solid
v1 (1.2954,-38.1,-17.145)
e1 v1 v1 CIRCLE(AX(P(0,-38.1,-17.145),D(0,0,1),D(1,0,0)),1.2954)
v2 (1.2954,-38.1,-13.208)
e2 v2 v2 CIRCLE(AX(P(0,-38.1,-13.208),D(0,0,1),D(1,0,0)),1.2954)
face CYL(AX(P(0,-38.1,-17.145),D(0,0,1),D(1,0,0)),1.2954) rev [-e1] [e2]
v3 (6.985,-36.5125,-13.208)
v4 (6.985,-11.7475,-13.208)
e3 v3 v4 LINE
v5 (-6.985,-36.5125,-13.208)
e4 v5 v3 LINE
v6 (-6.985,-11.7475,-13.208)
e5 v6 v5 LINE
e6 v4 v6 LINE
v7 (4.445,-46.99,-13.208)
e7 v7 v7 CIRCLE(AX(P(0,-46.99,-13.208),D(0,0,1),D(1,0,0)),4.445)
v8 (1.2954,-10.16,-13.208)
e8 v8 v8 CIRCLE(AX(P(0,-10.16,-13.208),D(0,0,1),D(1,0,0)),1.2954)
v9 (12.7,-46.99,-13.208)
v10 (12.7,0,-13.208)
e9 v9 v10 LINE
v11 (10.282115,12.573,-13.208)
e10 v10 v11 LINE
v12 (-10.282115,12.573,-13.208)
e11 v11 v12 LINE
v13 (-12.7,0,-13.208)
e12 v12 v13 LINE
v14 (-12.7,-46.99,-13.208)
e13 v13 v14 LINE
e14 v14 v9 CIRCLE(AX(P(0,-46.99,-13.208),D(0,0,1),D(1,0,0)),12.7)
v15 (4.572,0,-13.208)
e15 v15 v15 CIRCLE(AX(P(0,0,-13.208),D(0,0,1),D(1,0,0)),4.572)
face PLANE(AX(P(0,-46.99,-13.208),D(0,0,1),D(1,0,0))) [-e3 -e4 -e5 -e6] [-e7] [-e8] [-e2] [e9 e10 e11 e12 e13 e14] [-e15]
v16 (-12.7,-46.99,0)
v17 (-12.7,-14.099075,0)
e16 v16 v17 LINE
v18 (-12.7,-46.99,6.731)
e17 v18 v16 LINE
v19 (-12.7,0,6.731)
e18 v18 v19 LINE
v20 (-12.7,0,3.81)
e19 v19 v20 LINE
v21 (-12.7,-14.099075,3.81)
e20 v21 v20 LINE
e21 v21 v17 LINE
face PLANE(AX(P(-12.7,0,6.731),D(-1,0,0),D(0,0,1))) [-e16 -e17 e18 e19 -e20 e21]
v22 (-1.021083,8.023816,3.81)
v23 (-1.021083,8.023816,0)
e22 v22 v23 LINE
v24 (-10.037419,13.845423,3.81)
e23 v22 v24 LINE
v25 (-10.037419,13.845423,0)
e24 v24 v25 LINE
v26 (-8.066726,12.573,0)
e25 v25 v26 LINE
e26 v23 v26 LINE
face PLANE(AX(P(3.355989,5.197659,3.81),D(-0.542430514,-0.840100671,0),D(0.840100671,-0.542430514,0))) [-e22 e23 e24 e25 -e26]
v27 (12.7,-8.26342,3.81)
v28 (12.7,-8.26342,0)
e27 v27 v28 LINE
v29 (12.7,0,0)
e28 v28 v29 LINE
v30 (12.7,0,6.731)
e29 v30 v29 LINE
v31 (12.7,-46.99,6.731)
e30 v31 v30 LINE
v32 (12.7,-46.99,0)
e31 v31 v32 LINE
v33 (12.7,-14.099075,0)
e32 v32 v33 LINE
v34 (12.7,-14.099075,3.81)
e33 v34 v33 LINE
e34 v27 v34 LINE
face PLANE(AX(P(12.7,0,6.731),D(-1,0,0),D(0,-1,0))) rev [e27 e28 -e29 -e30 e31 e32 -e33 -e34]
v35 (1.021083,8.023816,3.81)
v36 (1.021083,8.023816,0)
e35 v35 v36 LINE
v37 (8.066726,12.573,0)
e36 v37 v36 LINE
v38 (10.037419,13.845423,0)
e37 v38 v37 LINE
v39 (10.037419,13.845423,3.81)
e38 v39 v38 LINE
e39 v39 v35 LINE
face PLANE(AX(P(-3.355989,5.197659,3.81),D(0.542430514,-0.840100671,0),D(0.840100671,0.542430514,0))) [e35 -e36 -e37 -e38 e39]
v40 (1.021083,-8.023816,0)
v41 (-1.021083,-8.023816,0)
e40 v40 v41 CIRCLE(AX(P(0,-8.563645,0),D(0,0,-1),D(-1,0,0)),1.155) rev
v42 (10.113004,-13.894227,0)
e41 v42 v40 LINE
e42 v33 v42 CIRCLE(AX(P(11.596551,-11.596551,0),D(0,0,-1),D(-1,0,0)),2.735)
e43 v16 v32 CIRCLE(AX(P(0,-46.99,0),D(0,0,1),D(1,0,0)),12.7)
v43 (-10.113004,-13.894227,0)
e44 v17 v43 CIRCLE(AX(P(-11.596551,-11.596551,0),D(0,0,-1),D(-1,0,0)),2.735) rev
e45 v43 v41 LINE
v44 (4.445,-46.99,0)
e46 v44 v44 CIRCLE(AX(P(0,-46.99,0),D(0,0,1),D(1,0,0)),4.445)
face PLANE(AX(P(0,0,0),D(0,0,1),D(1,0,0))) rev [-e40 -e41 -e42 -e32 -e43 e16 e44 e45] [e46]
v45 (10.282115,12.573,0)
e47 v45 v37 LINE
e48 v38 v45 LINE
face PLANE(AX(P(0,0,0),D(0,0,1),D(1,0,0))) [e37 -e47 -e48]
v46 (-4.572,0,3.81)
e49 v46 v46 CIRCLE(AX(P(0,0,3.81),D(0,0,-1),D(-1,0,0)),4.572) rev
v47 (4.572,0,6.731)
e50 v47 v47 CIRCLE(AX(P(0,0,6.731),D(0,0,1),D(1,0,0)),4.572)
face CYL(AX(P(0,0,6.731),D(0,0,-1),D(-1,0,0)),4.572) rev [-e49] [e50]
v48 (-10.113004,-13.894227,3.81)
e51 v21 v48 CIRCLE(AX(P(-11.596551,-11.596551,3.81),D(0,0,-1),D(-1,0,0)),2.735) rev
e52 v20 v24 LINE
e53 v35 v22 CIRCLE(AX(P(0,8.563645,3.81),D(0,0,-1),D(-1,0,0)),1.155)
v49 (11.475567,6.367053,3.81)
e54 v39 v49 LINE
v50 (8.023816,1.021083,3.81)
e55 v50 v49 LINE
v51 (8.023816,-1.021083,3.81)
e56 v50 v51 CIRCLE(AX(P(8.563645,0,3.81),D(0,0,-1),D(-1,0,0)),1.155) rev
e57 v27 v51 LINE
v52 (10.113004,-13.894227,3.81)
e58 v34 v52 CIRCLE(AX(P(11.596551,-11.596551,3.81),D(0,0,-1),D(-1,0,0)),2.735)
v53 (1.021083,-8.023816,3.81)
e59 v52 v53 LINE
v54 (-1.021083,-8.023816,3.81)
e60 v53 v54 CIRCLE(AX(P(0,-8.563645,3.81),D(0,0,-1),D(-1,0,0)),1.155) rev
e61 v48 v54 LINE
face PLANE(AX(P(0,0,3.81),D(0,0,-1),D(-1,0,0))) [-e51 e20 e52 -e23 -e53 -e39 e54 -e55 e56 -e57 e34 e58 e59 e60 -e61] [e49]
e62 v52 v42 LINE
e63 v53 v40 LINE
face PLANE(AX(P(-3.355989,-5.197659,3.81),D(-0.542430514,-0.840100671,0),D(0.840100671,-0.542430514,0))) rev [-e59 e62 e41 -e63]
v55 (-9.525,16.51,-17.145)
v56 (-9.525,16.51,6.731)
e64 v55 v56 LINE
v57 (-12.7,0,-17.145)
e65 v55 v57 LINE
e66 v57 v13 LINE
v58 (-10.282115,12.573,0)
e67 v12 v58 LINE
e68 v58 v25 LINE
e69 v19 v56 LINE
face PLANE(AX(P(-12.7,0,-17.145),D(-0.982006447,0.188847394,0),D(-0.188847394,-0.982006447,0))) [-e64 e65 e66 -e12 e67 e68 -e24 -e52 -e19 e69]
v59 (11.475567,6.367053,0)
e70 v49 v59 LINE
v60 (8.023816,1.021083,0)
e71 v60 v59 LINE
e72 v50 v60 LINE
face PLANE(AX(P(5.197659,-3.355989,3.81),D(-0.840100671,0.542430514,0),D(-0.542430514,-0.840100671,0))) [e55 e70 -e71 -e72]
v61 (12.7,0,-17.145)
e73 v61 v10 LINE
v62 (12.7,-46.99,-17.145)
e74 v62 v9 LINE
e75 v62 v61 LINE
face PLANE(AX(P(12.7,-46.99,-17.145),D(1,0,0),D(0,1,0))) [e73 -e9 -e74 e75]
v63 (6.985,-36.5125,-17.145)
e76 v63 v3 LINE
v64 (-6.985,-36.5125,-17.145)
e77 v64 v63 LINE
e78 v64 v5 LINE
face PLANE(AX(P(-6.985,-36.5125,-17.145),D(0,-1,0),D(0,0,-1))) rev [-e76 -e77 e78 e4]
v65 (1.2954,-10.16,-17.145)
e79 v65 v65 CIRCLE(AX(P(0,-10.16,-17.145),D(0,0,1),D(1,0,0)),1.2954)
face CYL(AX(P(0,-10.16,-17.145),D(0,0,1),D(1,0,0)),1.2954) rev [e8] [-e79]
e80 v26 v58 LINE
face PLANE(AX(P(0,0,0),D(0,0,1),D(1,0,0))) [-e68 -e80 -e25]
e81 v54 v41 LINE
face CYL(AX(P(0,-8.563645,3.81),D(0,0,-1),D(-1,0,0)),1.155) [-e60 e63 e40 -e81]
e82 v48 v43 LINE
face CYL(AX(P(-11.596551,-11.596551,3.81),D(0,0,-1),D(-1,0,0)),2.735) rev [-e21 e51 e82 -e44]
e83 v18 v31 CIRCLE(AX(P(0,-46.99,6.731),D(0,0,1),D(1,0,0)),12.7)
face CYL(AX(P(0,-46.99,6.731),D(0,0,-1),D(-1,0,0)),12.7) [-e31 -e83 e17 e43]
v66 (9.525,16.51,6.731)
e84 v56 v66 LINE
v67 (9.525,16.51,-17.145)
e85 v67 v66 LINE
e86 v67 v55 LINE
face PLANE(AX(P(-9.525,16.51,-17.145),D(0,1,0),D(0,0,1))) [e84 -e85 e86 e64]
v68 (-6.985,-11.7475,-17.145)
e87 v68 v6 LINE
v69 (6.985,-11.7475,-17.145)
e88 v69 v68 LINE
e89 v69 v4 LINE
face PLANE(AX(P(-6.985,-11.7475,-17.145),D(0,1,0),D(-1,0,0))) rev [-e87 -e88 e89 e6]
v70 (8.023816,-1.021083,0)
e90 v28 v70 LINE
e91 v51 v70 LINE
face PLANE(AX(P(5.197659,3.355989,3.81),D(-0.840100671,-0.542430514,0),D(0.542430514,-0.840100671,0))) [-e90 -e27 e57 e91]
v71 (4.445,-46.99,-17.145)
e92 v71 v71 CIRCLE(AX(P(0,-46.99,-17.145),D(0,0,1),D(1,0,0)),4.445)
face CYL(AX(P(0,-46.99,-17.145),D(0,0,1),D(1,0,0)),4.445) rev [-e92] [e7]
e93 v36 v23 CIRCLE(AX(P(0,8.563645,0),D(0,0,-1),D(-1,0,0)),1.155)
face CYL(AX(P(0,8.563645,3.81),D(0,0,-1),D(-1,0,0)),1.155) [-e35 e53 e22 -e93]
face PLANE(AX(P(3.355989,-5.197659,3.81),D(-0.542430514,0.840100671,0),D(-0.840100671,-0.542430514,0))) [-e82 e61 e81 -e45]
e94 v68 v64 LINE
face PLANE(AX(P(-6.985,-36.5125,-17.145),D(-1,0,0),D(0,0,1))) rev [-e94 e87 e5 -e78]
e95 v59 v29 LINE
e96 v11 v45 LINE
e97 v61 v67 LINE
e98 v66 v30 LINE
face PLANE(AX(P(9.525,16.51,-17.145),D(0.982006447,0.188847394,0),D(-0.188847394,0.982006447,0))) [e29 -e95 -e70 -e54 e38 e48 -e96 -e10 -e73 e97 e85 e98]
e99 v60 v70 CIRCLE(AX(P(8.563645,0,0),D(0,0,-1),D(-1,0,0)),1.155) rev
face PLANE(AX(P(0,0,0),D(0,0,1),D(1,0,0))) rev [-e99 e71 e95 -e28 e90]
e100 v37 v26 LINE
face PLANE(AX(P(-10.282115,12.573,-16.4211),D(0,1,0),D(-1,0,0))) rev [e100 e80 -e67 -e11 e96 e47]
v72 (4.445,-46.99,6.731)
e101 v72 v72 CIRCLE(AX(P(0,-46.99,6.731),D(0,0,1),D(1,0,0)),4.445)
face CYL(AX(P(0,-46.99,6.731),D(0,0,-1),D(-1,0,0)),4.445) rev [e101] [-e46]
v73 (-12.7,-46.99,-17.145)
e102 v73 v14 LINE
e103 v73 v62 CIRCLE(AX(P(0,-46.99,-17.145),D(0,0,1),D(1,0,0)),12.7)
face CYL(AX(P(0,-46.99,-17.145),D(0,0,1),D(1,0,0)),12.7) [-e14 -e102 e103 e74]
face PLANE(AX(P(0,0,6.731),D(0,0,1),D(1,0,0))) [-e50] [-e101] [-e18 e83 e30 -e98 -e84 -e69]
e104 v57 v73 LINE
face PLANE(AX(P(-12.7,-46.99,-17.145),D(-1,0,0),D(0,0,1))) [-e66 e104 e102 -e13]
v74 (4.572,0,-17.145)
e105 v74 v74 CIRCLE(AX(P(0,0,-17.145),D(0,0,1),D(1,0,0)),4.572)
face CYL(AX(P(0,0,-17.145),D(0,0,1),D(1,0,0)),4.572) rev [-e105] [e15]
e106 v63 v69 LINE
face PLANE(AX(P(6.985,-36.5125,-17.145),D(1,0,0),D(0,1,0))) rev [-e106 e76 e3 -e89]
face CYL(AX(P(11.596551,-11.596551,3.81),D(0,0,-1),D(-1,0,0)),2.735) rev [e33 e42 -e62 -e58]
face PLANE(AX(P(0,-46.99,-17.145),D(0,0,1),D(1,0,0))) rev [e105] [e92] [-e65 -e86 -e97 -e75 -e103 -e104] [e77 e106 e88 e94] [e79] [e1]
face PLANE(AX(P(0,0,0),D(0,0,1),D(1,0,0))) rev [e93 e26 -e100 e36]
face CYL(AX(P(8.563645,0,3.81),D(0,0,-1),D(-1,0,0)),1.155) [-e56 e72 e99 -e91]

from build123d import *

# Parameters (mm, degrees)
SKETCH1_R              = 4.572
SKETCH1_R_2            = 4.445
BOSS_EXTRUDE1_DEPTH    = 6.731
BOSS_EXTRUDE3_START    = -13.208
SKETCH1_5_R            = 4.572
SKETCH1_5_R_2          = 1.2954
SKETCH1_5_R_3          = 4.445
SKETCH1_5_W            = 13.97
SKETCH1_5_H            = 24.765
BOSS_EXTRUDE3_DEPTH    = 3.937
CUT_EXTRUDE4_START     = -3.81
CUT_EXTRUDE4_OUTLINE_R = 4.572
CUT_EXTRUDE4_DEPTH     = 3.81
BOSS_EXTRUDE5_DEPTH    = 16.4211


# Read off the part's stored shape, not the designer's step: Cut-Extrude4
with BuildPart() as part:
    # Sketch1 (on Front Plane) → Boss-Extrude1 (new body)
    with BuildSketch(Plane.XY):
        with BuildLine():
            Line((-12.7, 0), (-9.525, 16.51))
            Line((-9.525, 16.51), (9.525, 16.51))
            Line((9.525, 16.51), (12.7, 0))
            Line((12.7, 0), (12.7, -46.99))
            ThreePointArc((12.7, -46.99), (0, -59.69), (-12.7, -46.99))
            Line((-12.7, -46.99), (-12.7, 0))
        make_face()
        Circle(SKETCH1_R, mode=Mode.SUBTRACT)
        with Locations((0, -46.99)):
            Circle(SKETCH1_R_2, mode=Mode.SUBTRACT)
    extrude(amount=BOSS_EXTRUDE1_DEPTH)

    # Cut-Extrude4 outline → Cut-Extrude4 (cut)
    with BuildSketch(Plane(origin=(0, 0, 0), x_dir=(-1, 0, 0), z_dir=(0, 0, -1)).offset(CUT_EXTRUDE4_START)):
        with BuildLine():
            Line((1.021082558, -8.023816422), (10.113003756, -13.894226547))
            ThreePointArc((10.113003756, -13.894226547), (11.380658922, -14.323016968), (12.7, -14.099075092))
            Line((12.7, -14.099075092), (12.7, 0))
            Line((12.7, 0), (10.037418608, 13.84542324))
            Line((10.037418608, 13.84542324), (1.021082558, 8.023816422))
            ThreePointArc((1.021082558, 8.023816422), (0, 7.408645479), (-1.021082558, 8.023816422))
            Line((-1.021082558, 8.023816422), (-10.037418608, 13.84542324))
            Line((-10.037418608, 13.84542324), (-11.47556666, 6.367053366))
            Line((-11.47556666, 6.367053366), (-8.023816422, 1.021082558))
            ThreePointArc((-8.023816422, 1.021082558), (-7.408645479, 0), (-8.023816422, -1.021082558))
            Line((-8.023816422, -1.021082558), (-12.7, -8.263420264))
            Line((-12.7, -8.263420264), (-12.7, -14.099075092))
            ThreePointArc((-12.7, -14.099075092), (-11.380658922, -14.323016968), (-10.113003756, -13.894226547))
            Line((-10.113003756, -13.894226547), (-1.021082558, -8.023816422))
            ThreePointArc((-1.021082558, -8.023816422), (0, -7.408645479), (1.021082558, -8.023816422))
        make_face()
        Circle(CUT_EXTRUDE4_OUTLINE_R, mode=Mode.SUBTRACT)
    extrude(amount=CUT_EXTRUDE4_DEPTH, mode=Mode.SUBTRACT)



with BuildPart() as body_2:
    # Sketch1<5> → Boss-Extrude3 (new body)
    with BuildSketch(Plane.XY.offset(BOSS_EXTRUDE3_START)):
        with BuildLine():
            Line((-12.7, 0), (-9.525, 16.51))
            Line((-9.525, 16.51), (9.525, 16.51))
            Line((9.525, 16.51), (12.7, 0))
            Line((12.7, 0), (12.7, -46.99))
            ThreePointArc((12.7, -46.99), (0, -59.69), (-12.7, -46.99))
            Line((-12.7, -46.99), (-12.7, 0))
        make_face()
        Circle(SKETCH1_5_R, mode=Mode.SUBTRACT)
        with Locations((0, -10.16)):
            Circle(SKETCH1_5_R_2, mode=Mode.SUBTRACT)
        with Locations((0, -38.1)):
            Circle(SKETCH1_5_R_2, mode=Mode.SUBTRACT)
        with Locations((0, -46.99)):
            Circle(SKETCH1_5_R_3, mode=Mode.SUBTRACT)
        with Locations((0, -24.13)):
            Rectangle(SKETCH1_5_W, SKETCH1_5_H, mode=Mode.SUBTRACT)
    extrude(amount=-BOSS_EXTRUDE3_DEPTH)


with BuildPart() as part_1:
    add(part.part)

    add(body_2.part)  # Boss-Extrude5 merges body 2
    # Sketch5 → Boss-Extrude5 (add)
    with BuildSketch(Plane(origin=(0, 0, 0), x_dir=(-1, 0, 0), z_dir=(0, 0, -1))):
        Polygon((-9.525, 16.51), (9.525, 16.51), (10.282115385, 12.573), (-10.282115385, 12.573), align=None)
    extrude(amount=BOSS_EXTRUDE5_DEPTH)


solid = part_1.part
